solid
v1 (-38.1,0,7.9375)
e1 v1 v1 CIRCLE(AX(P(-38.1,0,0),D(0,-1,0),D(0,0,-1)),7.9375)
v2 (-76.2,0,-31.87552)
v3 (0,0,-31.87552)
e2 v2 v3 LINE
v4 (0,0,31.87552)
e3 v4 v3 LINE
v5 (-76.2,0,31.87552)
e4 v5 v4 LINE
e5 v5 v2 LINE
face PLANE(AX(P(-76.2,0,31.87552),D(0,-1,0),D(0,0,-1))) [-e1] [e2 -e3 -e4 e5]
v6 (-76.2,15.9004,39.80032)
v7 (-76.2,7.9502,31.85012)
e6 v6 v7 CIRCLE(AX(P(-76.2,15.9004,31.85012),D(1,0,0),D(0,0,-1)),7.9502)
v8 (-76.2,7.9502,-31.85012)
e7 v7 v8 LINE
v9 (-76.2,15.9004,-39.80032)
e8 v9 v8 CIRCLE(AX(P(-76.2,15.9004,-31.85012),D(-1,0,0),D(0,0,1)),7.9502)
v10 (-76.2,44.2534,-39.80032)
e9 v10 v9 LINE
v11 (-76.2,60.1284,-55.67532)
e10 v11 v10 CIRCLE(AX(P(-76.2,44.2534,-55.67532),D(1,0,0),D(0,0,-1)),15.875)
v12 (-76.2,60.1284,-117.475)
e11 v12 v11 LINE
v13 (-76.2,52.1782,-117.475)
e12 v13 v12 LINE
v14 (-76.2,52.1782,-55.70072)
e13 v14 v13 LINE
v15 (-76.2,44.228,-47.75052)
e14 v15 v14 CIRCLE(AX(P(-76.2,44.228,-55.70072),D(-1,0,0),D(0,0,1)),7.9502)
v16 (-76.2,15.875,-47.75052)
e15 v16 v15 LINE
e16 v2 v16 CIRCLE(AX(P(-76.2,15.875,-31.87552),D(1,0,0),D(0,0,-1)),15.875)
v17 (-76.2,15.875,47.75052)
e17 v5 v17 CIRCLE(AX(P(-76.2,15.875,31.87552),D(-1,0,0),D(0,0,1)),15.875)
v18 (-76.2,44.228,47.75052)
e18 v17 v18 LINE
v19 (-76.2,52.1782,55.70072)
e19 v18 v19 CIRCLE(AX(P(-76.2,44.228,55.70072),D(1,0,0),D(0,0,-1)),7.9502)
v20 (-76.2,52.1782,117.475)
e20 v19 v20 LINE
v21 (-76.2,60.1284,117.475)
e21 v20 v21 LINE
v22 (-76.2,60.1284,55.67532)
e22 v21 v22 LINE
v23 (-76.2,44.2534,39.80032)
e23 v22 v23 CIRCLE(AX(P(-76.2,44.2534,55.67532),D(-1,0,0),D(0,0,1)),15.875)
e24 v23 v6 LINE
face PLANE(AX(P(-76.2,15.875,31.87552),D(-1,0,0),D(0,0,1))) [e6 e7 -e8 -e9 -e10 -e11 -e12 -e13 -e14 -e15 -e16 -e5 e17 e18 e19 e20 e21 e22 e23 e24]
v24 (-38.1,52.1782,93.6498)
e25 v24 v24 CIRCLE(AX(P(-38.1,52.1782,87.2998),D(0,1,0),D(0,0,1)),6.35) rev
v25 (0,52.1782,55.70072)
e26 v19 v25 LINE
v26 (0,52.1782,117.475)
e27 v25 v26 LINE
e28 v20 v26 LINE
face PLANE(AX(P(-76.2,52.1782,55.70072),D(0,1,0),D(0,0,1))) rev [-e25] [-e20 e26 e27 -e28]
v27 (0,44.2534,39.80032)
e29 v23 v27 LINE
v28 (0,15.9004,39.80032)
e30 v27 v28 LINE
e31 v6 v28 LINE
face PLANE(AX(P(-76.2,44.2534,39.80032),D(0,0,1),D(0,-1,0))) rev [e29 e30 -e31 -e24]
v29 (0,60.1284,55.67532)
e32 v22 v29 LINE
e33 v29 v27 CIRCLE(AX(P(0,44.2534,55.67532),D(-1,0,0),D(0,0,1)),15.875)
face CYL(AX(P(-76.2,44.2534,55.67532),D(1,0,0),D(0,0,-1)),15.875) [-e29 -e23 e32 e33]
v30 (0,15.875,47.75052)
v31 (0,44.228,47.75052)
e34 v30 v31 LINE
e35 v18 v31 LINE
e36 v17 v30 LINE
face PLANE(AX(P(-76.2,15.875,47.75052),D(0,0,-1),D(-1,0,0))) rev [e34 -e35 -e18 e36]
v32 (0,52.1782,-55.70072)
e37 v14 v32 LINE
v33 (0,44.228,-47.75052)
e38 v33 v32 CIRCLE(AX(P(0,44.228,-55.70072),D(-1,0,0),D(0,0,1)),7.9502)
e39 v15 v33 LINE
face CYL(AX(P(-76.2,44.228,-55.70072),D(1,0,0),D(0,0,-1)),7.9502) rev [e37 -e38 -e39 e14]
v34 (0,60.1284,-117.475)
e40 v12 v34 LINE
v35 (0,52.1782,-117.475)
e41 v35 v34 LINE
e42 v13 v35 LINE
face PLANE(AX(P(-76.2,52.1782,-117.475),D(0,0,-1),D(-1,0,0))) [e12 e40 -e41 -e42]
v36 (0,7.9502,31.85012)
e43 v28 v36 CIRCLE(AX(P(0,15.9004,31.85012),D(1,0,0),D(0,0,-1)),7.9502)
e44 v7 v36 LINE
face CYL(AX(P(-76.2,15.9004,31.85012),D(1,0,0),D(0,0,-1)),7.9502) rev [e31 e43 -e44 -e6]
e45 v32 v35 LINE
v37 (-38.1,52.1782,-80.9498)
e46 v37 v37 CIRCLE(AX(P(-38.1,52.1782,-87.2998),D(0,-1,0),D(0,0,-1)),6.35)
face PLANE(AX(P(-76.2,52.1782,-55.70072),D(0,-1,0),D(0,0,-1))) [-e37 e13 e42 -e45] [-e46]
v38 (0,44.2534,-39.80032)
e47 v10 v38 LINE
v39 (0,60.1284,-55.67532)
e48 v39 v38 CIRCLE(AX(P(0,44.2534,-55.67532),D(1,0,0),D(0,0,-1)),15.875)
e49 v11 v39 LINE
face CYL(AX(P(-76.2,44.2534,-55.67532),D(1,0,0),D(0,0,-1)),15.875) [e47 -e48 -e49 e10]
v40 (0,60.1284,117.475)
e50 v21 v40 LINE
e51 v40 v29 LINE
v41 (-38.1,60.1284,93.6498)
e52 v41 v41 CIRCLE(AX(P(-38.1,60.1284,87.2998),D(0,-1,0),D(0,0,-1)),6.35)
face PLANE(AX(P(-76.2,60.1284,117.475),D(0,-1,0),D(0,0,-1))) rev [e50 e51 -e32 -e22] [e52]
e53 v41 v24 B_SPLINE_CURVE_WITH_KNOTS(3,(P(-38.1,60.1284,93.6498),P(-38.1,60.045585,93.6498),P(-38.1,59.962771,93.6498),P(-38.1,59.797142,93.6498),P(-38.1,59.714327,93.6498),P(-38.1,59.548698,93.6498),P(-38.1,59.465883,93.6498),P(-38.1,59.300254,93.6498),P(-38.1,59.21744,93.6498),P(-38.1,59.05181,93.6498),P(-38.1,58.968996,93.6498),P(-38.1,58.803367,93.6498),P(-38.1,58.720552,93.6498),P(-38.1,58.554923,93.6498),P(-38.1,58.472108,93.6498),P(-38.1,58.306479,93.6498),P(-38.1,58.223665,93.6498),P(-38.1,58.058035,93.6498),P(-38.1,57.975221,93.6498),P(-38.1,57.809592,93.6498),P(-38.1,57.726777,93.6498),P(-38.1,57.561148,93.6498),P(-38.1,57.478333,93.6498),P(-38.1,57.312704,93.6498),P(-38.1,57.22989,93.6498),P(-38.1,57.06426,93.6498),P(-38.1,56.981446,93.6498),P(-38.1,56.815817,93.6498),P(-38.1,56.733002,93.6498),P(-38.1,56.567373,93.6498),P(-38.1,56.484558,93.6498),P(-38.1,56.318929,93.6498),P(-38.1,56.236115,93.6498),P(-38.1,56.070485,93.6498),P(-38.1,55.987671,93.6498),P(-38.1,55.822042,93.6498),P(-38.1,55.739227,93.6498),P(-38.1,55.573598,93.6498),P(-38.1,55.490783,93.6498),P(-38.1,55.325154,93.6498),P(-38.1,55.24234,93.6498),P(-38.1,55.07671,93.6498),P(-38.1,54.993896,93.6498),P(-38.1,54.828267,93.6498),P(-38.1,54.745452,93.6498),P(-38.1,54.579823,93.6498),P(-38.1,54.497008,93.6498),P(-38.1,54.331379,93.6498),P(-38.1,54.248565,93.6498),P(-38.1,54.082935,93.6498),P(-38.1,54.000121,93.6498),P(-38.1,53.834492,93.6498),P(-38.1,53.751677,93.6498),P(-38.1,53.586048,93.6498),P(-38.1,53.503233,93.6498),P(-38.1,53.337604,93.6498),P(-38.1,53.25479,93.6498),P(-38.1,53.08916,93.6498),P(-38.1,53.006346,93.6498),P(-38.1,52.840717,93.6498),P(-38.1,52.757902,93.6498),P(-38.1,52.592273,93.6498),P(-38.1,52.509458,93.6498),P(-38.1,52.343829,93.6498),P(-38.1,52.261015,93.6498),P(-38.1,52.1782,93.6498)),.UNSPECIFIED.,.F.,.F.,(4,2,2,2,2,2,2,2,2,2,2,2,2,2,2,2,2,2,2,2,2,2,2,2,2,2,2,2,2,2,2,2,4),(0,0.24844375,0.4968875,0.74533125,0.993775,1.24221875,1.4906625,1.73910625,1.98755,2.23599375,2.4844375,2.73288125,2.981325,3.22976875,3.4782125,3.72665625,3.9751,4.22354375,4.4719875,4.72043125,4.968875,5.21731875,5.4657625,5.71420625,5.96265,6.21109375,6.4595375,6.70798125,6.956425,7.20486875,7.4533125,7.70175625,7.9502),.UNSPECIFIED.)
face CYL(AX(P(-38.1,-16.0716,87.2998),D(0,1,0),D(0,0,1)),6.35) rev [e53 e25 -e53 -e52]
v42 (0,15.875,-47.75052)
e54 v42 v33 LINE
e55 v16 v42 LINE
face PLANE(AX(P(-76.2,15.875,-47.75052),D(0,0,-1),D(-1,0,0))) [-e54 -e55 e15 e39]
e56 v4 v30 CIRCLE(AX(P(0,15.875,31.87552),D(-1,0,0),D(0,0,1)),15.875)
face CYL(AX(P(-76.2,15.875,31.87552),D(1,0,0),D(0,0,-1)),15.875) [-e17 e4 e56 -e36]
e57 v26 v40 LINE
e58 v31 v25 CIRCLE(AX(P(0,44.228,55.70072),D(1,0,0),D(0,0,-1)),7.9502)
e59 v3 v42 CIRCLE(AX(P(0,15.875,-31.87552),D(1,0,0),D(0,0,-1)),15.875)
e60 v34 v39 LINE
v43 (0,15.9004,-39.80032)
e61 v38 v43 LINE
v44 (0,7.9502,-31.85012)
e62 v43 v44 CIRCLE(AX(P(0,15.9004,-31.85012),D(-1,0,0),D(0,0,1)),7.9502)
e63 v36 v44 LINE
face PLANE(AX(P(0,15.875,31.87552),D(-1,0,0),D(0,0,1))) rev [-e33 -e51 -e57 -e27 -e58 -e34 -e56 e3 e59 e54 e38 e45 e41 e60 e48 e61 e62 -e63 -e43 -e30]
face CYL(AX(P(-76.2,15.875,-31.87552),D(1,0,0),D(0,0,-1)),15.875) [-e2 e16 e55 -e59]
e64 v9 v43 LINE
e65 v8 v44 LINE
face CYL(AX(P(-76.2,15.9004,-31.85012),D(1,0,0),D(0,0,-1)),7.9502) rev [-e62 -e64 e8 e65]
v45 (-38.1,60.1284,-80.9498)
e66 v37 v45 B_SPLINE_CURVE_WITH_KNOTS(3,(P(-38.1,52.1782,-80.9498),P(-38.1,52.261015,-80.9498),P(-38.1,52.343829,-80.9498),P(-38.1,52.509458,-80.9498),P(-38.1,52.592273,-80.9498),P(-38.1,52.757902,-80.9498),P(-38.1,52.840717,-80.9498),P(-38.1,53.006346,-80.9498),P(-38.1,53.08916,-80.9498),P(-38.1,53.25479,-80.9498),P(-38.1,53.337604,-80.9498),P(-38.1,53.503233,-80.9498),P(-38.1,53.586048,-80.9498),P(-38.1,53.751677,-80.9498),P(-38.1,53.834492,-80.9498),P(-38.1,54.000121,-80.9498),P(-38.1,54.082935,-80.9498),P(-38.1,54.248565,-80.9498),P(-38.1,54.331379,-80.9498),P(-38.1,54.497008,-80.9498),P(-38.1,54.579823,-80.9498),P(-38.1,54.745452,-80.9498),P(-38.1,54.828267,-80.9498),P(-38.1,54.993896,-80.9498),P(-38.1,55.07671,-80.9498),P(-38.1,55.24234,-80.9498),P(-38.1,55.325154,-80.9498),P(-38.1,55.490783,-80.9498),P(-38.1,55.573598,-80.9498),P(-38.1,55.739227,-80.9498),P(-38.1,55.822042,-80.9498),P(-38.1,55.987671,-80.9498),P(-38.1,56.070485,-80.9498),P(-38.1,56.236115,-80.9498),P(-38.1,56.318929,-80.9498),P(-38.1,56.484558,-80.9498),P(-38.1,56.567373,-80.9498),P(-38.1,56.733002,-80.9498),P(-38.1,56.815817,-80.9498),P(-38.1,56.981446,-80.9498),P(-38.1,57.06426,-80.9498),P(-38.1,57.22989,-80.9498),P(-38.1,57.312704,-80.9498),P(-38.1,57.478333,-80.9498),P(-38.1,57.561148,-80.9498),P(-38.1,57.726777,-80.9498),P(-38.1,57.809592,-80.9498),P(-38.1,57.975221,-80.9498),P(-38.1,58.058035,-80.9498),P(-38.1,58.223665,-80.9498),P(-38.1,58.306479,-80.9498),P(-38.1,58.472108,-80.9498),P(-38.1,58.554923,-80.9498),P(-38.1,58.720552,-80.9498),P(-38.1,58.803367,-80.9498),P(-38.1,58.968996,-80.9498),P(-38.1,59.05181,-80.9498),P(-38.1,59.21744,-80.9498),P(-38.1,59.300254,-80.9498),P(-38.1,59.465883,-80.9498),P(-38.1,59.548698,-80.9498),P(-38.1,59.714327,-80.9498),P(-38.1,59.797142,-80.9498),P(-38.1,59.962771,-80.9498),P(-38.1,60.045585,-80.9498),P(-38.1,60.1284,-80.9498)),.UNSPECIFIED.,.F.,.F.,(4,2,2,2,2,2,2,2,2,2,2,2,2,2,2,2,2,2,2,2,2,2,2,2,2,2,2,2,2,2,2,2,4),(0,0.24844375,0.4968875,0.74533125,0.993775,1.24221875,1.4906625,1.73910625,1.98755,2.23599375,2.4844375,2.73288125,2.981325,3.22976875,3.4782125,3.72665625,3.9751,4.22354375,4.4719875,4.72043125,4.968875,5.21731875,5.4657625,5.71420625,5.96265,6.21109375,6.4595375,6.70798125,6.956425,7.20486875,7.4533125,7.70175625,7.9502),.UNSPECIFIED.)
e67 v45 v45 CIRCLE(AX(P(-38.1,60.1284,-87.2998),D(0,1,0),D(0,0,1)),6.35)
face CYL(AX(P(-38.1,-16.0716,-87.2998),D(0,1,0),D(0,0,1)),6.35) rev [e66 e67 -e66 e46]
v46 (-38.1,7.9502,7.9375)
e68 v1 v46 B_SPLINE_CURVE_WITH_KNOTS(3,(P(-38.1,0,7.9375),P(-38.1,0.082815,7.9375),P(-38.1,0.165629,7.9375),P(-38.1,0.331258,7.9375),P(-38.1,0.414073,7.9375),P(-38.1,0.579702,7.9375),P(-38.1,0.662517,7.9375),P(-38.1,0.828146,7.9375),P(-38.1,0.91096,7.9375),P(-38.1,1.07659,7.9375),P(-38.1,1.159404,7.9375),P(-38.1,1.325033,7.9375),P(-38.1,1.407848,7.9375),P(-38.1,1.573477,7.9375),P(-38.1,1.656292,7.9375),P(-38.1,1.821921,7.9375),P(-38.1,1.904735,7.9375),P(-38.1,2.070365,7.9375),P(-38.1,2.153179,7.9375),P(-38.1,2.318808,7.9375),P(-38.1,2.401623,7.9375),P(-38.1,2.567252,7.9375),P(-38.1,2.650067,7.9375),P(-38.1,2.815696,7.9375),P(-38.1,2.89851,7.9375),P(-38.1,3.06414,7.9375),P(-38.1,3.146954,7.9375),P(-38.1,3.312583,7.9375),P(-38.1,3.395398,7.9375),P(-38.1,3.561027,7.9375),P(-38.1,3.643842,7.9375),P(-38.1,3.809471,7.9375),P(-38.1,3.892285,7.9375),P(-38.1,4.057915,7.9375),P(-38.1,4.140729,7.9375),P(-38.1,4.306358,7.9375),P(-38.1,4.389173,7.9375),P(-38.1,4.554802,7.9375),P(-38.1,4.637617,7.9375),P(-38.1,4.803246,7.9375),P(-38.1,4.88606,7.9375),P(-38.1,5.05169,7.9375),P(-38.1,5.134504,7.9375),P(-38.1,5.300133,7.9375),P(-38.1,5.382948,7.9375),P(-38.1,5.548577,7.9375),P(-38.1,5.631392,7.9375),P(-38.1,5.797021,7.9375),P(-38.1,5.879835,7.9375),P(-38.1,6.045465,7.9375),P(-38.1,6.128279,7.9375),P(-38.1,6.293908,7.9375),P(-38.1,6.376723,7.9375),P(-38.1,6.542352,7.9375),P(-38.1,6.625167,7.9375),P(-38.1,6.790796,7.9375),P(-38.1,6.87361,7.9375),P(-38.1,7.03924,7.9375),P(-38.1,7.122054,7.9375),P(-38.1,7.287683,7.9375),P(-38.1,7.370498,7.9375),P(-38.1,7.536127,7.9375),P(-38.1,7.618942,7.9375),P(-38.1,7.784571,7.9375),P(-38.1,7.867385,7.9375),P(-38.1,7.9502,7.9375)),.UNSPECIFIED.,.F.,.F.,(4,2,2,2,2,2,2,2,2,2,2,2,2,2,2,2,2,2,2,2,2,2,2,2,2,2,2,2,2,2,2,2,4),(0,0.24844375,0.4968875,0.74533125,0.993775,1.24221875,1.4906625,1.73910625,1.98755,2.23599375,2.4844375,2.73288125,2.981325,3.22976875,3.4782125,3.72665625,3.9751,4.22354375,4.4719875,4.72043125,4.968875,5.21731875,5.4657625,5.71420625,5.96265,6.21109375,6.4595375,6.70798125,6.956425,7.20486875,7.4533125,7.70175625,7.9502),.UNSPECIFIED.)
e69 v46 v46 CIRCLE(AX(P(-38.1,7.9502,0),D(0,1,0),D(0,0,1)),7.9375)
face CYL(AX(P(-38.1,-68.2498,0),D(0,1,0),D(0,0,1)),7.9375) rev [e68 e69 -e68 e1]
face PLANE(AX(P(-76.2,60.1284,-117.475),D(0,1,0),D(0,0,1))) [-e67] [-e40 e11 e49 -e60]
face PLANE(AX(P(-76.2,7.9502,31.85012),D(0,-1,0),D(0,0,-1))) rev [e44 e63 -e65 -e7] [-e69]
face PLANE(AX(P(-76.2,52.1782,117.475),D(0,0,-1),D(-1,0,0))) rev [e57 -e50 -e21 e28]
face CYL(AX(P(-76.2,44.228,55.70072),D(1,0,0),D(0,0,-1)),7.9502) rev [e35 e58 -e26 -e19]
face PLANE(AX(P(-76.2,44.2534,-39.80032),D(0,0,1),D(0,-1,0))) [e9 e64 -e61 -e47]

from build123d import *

# Parameters (mm, degrees)
BOSS_EXTRUDE3_START = -76.2
BOSS_EXTRUDE3_DEPTH = 76.2
SKETCH3_R           = 7.9375
CUT_EXTRUDE1_DEPTH  = 76.2
SKETCH2_R           = 6.35
CUT_EXTRUDE3_DEPTH  = 76.2


# Read off the part's stored shape, not the designer's step: Boss-Extrude3
with BuildPart() as part:
    # Boss-Extrude3 outline → Boss-Extrude3 (new body)
    with BuildSketch(Plane.YZ.offset(BOSS_EXTRUDE3_START)):
        with BuildLine():
            Line((44.228000004, 47.750520151), (15.875, 47.750520151))
            ThreePointArc((15.875, 47.750520151), (4.649679848, 43.100840303), (0, 31.875520151))
            Line((0, 31.875520151), (0, -31.875520151))
            ThreePointArc((0, -31.875520151), (4.649679849, -43.100840302), (15.875, -47.750520151))
            Line((15.875, -47.750520151), (44.228000004, -47.750520151))
            ThreePointArc((44.228000004, -47.750520151), (49.849640336, -50.079079819), (52.178200004, -55.700720151))
            Line((52.178200004, -55.700720151), (52.178200004, -117.475))
            Line((52.178200004, -117.475), (60.128400004, -117.475))
            Line((60.128400004, -117.475), (60.128400004, -55.675320151))
            ThreePointArc((60.128400004, -55.675320151), (55.478720155, -44.45), (44.253400004, -39.800320151))
            Line((44.253400004, -39.800320151), (15.9004, -39.800320151))
            ThreePointArc((15.9004, -39.800320151), (10.278759668, -37.471760483), (7.9502, -31.850120151))
            Line((7.9502, -31.850120151), (7.9502, 31.850120151))
            ThreePointArc((7.9502, 31.850120151), (10.278759668, 37.471760483), (15.9004, 39.800320151))
            Line((15.9004, 39.800320151), (44.253400004, 39.800320151))
            ThreePointArc((44.253400004, 39.800320151), (55.478720155, 44.45), (60.128400004, 55.675320151))
            Line((60.128400004, 55.675320151), (60.128400004, 117.475))
            Line((60.128400004, 117.475), (52.178200004, 117.475))
            Line((52.178200004, 117.475), (52.178200004, 55.700720151))
            ThreePointArc((52.178200004, 55.700720151), (49.849640335, 50.079079819), (44.228000004, 47.750520151))
        make_face()
    extrude(amount=BOSS_EXTRUDE3_DEPTH)

    # Sketch3 → Cut-Extrude1 (cut)
    with BuildSketch(Plane(origin=(0, 7.9502, 0), x_dir=(1, 0, 0), z_dir=(0, 1, 0))):
        with Locations(Location((-38.1, 0, 0), (0, 0, 270))):
            Circle(SKETCH3_R)
    extrude(amount=-CUT_EXTRUDE1_DEPTH, mode=Mode.SUBTRACT)

    # Sketch2 → Cut-Extrude3 (cut)
    with BuildSketch(Plane(origin=(0, 60.128400004, 0), x_dir=(1, 0, 0), z_dir=(0, 1, 0))):
        with Locations(Location((-38.1, 87.2998, 0), (0, 0, 270))):
            Circle(SKETCH2_R)
        with Locations(Location((-38.1, -87.2998, 0), (0, 0, 270))):
            Circle(SKETCH2_R)
    extrude(amount=-CUT_EXTRUDE3_DEPTH, mode=Mode.SUBTRACT)


solid = part.part
